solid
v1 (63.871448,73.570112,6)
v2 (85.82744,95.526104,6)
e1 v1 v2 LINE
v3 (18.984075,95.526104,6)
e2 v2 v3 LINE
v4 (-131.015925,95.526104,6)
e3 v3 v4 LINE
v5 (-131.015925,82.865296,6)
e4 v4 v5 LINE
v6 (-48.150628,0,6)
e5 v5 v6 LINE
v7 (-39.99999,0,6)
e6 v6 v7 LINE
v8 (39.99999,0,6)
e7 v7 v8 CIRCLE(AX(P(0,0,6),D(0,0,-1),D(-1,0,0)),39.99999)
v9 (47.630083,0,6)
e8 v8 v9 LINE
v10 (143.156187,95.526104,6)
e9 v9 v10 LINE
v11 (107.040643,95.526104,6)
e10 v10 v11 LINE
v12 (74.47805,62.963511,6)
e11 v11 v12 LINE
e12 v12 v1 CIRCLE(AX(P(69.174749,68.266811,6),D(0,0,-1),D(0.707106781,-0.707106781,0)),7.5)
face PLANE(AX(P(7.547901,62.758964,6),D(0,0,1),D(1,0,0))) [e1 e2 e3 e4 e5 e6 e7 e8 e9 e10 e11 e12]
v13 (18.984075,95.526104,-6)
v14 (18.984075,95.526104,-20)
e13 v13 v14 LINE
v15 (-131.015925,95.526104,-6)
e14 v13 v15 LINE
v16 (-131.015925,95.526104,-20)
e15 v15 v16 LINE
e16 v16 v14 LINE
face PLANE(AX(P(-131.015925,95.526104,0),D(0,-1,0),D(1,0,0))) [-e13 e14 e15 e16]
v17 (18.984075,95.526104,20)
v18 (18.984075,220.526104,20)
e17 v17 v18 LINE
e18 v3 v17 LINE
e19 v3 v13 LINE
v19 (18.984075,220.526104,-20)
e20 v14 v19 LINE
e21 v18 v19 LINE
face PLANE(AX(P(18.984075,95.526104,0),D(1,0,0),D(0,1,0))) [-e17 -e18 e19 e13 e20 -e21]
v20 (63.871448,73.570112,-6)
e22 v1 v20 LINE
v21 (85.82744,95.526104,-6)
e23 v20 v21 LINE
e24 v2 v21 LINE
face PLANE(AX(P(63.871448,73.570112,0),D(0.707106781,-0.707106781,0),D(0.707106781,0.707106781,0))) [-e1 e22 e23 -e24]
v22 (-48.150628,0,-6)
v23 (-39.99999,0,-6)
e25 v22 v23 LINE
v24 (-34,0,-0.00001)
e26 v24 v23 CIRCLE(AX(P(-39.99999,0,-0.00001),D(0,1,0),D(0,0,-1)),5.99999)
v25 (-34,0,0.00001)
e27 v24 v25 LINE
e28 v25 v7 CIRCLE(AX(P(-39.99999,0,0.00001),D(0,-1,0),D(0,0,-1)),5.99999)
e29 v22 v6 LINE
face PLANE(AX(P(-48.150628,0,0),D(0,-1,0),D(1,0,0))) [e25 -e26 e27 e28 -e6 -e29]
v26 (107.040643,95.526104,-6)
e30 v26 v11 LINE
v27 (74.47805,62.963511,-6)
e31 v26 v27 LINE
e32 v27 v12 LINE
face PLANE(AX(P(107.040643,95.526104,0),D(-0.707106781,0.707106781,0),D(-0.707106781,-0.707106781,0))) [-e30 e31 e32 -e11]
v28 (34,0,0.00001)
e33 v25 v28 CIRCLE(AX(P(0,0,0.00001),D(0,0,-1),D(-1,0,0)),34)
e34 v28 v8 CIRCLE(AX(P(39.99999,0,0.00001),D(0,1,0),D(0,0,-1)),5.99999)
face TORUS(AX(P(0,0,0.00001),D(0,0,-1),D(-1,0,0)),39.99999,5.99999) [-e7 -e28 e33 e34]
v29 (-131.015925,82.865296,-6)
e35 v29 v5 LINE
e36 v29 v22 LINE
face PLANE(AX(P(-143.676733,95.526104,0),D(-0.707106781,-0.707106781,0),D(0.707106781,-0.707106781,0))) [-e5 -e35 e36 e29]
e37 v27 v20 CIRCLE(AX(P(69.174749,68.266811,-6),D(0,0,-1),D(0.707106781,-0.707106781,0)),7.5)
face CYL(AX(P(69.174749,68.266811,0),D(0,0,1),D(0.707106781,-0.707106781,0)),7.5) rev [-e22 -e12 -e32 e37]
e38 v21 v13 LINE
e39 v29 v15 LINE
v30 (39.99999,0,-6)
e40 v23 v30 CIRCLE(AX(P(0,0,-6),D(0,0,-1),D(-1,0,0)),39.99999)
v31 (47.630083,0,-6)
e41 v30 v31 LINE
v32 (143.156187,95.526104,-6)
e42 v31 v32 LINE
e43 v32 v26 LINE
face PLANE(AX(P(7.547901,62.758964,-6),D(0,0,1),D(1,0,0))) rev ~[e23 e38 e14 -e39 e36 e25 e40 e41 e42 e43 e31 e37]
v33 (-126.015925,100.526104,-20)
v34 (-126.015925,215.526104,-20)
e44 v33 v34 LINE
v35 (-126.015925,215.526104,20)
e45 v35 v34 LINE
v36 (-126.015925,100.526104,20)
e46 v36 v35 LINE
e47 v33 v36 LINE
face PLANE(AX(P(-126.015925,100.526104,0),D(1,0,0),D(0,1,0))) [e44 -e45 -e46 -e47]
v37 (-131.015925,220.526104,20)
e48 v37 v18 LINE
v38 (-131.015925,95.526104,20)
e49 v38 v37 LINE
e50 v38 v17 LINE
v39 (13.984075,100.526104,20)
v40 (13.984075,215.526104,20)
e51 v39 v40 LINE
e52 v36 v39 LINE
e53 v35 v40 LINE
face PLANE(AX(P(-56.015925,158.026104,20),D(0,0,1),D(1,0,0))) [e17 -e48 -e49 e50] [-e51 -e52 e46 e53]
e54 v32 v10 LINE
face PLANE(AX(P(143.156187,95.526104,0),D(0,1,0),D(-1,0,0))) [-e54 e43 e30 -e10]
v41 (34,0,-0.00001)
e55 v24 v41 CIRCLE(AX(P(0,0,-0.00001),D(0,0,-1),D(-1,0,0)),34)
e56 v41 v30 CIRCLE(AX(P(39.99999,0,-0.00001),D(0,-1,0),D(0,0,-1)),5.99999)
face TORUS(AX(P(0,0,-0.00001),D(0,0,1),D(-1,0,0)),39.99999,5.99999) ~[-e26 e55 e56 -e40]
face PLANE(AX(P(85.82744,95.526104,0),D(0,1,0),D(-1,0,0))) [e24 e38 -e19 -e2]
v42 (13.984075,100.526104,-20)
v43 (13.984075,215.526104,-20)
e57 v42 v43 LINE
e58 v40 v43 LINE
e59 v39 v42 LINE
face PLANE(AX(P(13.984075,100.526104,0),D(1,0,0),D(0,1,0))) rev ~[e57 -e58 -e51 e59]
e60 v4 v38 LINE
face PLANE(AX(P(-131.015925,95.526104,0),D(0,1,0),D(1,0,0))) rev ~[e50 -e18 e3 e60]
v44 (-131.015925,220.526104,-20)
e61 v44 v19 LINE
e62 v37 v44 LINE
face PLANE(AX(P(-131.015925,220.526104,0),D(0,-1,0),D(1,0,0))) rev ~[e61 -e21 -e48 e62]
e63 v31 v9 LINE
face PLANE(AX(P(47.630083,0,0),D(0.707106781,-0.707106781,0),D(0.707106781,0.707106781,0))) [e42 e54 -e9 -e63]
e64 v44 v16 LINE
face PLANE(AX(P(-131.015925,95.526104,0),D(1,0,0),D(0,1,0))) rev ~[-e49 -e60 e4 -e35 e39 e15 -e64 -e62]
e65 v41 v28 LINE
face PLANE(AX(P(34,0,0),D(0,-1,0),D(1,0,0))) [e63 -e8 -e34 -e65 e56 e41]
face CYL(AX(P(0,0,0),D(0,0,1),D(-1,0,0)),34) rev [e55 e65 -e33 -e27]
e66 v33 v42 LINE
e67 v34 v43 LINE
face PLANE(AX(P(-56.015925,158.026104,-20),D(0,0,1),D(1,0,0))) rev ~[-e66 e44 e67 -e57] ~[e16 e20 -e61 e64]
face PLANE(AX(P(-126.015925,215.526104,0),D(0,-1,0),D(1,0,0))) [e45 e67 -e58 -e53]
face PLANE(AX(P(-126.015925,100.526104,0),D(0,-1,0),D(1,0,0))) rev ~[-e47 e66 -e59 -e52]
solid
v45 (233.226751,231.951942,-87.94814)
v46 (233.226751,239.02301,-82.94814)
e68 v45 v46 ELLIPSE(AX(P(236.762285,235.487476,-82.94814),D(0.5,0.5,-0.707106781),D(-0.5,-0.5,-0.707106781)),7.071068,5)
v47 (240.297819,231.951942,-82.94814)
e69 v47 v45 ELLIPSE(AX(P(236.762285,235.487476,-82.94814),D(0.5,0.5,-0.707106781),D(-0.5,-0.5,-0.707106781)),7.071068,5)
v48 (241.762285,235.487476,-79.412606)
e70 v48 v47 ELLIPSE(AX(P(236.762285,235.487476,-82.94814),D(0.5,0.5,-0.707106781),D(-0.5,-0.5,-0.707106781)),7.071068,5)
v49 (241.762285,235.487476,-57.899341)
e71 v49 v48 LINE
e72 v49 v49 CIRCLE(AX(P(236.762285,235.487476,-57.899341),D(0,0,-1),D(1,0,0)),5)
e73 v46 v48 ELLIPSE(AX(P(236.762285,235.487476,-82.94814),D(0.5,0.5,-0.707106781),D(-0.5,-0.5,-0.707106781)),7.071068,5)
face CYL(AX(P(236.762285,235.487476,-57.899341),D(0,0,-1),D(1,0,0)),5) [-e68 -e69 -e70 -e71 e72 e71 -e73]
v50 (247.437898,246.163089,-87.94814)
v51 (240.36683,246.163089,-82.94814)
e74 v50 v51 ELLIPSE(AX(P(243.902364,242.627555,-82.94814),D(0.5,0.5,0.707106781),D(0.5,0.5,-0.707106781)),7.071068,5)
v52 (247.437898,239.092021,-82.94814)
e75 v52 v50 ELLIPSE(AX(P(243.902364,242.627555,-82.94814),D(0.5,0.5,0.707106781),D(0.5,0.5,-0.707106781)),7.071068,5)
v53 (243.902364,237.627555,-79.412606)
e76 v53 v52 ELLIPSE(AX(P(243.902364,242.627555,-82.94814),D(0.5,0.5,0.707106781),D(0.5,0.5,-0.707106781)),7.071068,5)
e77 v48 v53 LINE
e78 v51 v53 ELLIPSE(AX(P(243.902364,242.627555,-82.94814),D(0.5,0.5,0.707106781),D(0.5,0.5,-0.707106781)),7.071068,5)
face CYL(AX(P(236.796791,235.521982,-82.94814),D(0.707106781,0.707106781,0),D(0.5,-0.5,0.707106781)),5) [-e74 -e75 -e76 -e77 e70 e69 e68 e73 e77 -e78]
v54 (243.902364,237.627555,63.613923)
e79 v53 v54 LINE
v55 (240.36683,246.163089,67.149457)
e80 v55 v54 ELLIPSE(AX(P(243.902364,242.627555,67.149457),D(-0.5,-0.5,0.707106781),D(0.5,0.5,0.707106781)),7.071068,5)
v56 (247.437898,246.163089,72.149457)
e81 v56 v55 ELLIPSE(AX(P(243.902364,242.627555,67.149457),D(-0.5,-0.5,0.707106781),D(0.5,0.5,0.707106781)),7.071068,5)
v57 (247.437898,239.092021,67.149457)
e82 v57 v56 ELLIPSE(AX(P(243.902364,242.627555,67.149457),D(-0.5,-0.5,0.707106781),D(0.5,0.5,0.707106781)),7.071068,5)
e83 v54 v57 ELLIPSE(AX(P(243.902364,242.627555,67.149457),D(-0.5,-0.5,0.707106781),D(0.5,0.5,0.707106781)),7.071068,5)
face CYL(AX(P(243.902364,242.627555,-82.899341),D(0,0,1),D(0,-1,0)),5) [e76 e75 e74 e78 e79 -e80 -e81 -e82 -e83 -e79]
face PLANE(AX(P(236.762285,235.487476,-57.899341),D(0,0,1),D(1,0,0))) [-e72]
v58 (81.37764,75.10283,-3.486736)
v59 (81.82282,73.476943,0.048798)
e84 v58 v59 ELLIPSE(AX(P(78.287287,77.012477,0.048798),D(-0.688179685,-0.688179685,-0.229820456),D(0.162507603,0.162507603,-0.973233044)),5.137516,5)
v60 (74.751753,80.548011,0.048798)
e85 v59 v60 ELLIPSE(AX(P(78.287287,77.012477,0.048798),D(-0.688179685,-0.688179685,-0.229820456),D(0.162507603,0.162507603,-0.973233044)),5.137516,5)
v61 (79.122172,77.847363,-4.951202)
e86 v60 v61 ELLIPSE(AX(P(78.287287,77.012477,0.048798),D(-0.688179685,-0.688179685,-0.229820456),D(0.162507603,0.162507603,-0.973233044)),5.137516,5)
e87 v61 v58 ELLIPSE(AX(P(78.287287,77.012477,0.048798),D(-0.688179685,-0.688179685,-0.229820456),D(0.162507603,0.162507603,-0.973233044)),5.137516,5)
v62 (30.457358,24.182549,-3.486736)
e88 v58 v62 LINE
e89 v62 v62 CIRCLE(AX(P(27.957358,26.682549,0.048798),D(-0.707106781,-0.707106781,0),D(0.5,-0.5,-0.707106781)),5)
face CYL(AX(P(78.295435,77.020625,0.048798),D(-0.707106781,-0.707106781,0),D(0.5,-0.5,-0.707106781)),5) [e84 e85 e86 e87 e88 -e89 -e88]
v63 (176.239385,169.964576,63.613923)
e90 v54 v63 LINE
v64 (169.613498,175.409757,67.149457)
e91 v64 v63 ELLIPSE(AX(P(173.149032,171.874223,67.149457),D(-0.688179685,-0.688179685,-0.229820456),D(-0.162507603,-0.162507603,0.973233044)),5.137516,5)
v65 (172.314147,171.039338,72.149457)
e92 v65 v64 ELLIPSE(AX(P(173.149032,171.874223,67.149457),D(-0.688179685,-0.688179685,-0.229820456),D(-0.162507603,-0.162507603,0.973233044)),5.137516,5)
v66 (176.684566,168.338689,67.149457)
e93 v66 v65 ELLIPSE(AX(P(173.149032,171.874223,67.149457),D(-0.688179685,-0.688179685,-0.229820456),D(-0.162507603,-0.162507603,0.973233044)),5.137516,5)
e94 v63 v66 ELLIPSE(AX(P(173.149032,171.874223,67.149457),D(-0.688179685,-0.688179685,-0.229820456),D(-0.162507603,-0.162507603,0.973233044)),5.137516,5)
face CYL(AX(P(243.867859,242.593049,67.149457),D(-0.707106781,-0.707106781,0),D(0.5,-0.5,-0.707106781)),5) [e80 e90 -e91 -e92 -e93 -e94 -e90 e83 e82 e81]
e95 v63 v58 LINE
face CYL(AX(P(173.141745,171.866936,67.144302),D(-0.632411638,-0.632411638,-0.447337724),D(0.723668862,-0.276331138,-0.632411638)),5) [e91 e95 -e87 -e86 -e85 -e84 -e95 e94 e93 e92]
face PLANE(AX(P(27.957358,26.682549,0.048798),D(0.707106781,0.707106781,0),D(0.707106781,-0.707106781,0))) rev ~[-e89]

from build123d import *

# Parameters (mm, degrees)
F3_DEPTH      = 6
F3_DEPTH_BACK = 6
F4_R          = 5.99999
F5_W          = 150
F5_H          = 125
F5_W_2        = 140
F5_H_2        = 115
F6_DEPTH      = 20
F6_DEPTH_BACK = 20
F7_W          = 18.4257775545
F7_H          = 22.6281583309
F8_DEPTH      = 25
F8_DEPTH_BACK = 25
F12_R         = 5


# Not quite as in the source:
# - a fillet or chamfer is up to 0.001 mm smaller than in the source, because OpenCascade refuses the exact size
# - the program builds the solid bodies; features that only make, move or delete a surface that nothing else refers to are left out


with BuildPart() as f3:
    # F2 (on Top) → F3 (new body, two sides)
    with BuildSketch(Plane.XY) as f3_sk:
        with BuildLine():
            Line((-143.6767325086, 95.5261040182), (-48.1506284904, 0))
            Line((-48.1506284904, 0), (-34, 0))
            ThreePointArc((-34, 0), (0, 34), (34, 0))
            Line((34, 0), (47.630082774, 0))
            Line((47.630082774, 0), (143.1561867922, 95.5261040182))
            Line((143.1561867922, 95.5261040182), (107.040643459, 95.5261040182))
            Line((107.040643459, 95.5261040182), (74.4780500334, 62.9635105926))
            ThreePointArc((74.4780500334, 62.9635105926), (63.8714483156, 62.9635105926), (63.8714483156, 73.5701123104))
            Line((63.8714483156, 73.5701123104), (85.8274400234, 95.5261040182))
            Line((85.8274400234, 95.5261040182), (-143.6767325086, 95.5261040182))
        make_face()
    extrude(amount=F3_DEPTH)
    extrude(f3_sk.sketch, amount=-F3_DEPTH_BACK)

    # F4 (radius 6 in the source; OpenCascade refuses exactly that, so slightly less here)
    f4_edges = [f3.edges().sort_by_distance(p)[0] for p in [
        (0, 34, 6),
        (0, 34, -6),
    ]]
    fillet(f4_edges, radius=F4_R)

    # F5 (on Top) → F6 (join, two sides)
    with BuildSketch(Plane.XY) as f6_sk:
        with Locations((-56.0159248962, 158.0261040182)):
            Rectangle(F5_W, F5_H)
        with Locations((-56.0159248962, 158.0261040182)):
            Rectangle(F5_W_2, F5_H_2, mode=Mode.SUBTRACT)
    extrude(amount=F6_DEPTH)
    extrude(f6_sk.sketch, amount=-F6_DEPTH_BACK)

    # F7 (on Top) → F8 (cut, two sides)
    with BuildSketch(Plane.XY) as f8_sk:
        with Locations((-140.2288136734, 86.2188637257)):
            Rectangle(F7_W, F7_H)
    extrude(amount=F8_DEPTH, mode=Mode.SUBTRACT)
    extrude(f8_sk.sketch, amount=-F8_DEPTH_BACK, mode=Mode.SUBTRACT)


with BuildPart() as f13:
    # F13: sweep along a path in F10
    with BuildLine(Plane(origin=(0.4539688615, -0.4539688615, 0), x_dir=(0.7071067812, 0.7071067812, 0), z_dir=(0.7071067812, -0.7071067812, 0))) as f13_path:
        Line((333.9798068309, -57.8993414214), (333.9798068309, -82.8993414214))
        Line((333.9798068309, -82.8993414214), (343.9798068309, -82.8993414214))
        Line((343.9798068309, -82.8993414214), (343.9798068309, 67.1006585786))
        Line((343.9798068309, 67.1006585786), (243.9798068309, 67.1006585786))
        Line((243.9798068309, 67.1006585786), (109.8250394228, 0))
        Line((109.8250394228, 0), (88.6497050524, 0))
        Line((88.6497050524, 0), (38.6362485588, 0))
    # F12 (on plane+point) → F13 (sweep)
    with BuildSketch(Plane.XY.offset(-57.8993414214)):
        with Locations((236.7622852325, 235.4874759912)):
            Circle(F12_R)
    sweep(path=f13_path.line, transition=Transition.RIGHT)


solid = Compound([f3.part, f13.part])
